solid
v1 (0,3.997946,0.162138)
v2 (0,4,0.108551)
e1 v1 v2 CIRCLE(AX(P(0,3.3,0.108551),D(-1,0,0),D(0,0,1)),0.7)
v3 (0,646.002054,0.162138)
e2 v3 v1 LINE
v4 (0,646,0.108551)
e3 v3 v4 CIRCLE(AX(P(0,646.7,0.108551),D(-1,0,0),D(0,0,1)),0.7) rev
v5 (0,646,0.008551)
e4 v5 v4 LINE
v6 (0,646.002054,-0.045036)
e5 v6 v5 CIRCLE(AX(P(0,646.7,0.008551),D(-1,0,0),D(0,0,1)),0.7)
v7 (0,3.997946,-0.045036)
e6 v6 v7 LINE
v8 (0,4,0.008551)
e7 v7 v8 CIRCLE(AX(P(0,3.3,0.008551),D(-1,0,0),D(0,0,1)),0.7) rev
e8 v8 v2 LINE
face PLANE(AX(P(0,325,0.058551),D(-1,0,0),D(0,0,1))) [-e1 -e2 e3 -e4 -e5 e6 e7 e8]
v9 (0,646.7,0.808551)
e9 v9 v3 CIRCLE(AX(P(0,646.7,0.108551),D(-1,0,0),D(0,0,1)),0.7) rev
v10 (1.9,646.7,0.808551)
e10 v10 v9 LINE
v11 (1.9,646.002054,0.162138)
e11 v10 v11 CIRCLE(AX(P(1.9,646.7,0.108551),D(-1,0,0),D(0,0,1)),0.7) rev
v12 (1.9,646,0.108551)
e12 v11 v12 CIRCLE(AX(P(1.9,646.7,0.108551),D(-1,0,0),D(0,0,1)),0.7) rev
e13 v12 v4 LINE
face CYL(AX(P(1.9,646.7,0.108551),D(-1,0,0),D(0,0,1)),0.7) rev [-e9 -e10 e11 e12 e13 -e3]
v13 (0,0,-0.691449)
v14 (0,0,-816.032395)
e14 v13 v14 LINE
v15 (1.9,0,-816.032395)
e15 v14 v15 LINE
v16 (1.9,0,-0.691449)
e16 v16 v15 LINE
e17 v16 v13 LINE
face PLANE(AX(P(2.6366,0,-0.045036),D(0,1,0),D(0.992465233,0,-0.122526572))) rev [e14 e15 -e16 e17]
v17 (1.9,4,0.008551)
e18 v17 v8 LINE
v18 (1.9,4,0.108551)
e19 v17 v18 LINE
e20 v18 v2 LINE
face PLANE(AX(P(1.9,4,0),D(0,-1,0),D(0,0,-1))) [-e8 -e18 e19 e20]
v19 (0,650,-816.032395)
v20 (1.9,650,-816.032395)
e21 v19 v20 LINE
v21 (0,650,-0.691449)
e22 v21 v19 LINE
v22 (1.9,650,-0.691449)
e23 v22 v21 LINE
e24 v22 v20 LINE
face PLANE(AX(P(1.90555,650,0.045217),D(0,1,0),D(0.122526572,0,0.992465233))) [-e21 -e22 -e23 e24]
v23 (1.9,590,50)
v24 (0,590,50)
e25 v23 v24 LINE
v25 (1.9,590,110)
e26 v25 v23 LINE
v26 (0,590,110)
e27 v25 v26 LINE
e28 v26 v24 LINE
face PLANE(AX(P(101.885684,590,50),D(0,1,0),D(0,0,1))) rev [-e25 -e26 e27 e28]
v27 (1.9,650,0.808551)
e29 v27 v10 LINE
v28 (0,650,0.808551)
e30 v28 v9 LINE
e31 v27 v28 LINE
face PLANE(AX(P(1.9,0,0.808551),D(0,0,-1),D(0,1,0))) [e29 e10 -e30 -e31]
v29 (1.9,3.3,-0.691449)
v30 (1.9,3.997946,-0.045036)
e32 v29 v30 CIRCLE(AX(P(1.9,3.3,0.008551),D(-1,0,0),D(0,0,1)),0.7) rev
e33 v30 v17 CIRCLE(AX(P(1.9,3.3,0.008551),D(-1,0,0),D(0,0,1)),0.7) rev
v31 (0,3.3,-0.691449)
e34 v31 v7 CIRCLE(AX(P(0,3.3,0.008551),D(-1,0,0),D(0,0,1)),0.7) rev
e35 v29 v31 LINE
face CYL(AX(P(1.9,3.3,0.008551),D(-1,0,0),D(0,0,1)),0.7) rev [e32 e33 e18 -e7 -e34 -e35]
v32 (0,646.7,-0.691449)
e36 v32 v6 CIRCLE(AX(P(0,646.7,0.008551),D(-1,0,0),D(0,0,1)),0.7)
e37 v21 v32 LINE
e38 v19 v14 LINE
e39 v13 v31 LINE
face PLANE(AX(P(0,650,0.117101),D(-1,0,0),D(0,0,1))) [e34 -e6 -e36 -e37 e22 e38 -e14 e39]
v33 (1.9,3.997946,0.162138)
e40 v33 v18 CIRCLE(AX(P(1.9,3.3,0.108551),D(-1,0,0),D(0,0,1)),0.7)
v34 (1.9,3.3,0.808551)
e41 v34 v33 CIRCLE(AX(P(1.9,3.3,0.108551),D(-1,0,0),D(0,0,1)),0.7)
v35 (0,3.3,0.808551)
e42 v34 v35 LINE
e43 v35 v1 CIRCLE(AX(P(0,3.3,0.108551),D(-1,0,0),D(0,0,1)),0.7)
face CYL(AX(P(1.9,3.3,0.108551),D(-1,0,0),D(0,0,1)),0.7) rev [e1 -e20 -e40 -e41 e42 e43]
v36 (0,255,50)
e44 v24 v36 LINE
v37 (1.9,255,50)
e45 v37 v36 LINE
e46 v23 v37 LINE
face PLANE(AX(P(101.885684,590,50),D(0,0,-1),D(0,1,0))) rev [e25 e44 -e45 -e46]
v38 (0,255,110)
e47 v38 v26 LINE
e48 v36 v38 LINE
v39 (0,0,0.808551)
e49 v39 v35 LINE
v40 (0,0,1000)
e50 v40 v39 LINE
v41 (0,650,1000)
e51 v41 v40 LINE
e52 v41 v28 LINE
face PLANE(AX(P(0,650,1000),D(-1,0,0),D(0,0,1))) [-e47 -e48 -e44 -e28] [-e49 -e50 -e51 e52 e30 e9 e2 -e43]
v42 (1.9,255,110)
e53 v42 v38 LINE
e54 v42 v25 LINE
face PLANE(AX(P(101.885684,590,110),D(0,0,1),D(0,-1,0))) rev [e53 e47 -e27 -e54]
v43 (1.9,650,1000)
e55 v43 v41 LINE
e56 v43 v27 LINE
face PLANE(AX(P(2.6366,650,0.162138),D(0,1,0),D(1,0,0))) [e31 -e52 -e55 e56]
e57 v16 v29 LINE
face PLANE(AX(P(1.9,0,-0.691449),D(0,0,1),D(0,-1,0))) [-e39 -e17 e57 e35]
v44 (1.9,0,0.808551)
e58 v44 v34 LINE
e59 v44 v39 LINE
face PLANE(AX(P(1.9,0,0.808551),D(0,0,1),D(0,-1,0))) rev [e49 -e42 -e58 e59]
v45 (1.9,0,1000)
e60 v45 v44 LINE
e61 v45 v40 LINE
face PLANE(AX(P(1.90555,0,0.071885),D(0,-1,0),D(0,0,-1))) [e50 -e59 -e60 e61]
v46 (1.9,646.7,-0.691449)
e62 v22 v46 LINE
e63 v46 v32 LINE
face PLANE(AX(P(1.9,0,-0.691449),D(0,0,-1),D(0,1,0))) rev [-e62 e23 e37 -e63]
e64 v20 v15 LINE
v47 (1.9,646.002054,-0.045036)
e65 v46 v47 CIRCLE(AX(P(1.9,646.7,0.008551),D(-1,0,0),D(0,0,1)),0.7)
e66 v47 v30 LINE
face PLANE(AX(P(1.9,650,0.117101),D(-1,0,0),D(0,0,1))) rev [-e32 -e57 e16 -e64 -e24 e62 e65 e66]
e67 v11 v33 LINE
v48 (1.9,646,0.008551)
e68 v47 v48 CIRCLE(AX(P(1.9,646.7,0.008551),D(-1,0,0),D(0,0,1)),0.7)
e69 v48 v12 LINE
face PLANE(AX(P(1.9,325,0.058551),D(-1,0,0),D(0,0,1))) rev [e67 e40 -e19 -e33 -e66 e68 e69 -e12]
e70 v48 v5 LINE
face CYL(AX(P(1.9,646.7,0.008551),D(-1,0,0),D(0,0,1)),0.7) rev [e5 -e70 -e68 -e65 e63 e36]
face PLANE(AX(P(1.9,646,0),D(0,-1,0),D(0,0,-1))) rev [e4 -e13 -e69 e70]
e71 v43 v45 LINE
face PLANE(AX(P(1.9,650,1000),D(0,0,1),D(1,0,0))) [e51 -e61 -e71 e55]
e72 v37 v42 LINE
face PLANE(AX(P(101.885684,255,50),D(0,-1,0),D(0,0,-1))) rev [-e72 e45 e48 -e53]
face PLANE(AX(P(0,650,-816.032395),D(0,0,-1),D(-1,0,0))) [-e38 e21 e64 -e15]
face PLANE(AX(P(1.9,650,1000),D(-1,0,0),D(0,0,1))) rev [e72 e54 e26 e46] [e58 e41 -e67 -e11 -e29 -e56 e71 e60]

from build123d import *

# Parameters (mm, degrees)
BRIDA_BASE2_DEPTH          = 650
CORTAR_EXTRUIR1_DEPTH      = 1198.029946406
CORTAR_EXTRUIR1_DEPTH_BACK = 1198.029946406
CROQUIS11_W                = 60
CROQUIS11_H                = 335
DESDOBLAR2_DEPTH           = 650
DESDOBLAR2_2_DEPTH         = 650
CORTAR_EXTRUIR2_DEPTH      = 1193.687557577
CORTAR_EXTRUIR2_DEPTH_BACK = 1193.687557577


# Read off the part's stored shape, not the designer's step: Desdoblar2
# Sheet-metal steps are written as plain solids
with BuildPart() as part:
    # Croquis1 → Brida base2 (new body)
    with BuildSketch(Plane(origin=(0, 0, 0), x_dir=(1, 0, 0), z_dir=(0, 1, 0))):
        with BuildLine():
            Line((0, -1000), (0, -0.162137614))
            ThreePointArc((0, -0.162137614), (0.004971228, -0.000305705), (0.019866166, 0.160915945))
            Line((0.019866166, 0.160915945), (100, 810))
            Line((100, 810), (101.885683943, 809.767199513))
            Line((101.885683943, 809.767199513), (1.905550109, -0.071884541))
            ThreePointArc((1.905550109, -0.071884541), (1.901388837, -0.116925833), (1.9, -0.162137614))
            Line((1.9, -0.162137614), (1.9, -1000))
            Line((1.9, -1000), (0, -1000))
        make_face()
    extrude(amount=BRIDA_BASE2_DEPTH)

    # Croquis11 → Cortar-Extruir1 (cut, two sides: drawn at the far end of the back side and taken through both)
    with BuildSketch(Plane.ZY.offset(-CORTAR_EXTRUIR1_DEPTH_BACK)):
        with Locations((80, 422.5)):
            Rectangle(CROQUIS11_W, CROQUIS11_H)
    extrude(amount=CORTAR_EXTRUIR1_DEPTH + CORTAR_EXTRUIR1_DEPTH_BACK, mode=Mode.SUBTRACT)

    # Desdoblar2 outline → Desdoblar2 (cut)
    with BuildSketch(Plane(origin=(0, 0, 0), x_dir=(1, 0, 0), z_dir=(0, 1, 0))):
        with BuildLine():
            Line((100, 810), (1.9, 15.39))
            Line((1.9, 15.39), (1.9, -0.162137614))
            ThreePointArc((1.9, -0.162137614), (1.901388837, -0.116925832), (1.905550109, -0.071884541))
            Line((1.905550109, -0.071884541), (101.885683943, 809.767199513))
            Line((101.885683943, 809.767199513), (100, 810))
        make_face()
    extrude(amount=DESDOBLAR2_DEPTH, mode=Mode.SUBTRACT)

    # Desdoblar2 2 outline → Desdoblar2 2 (add)
    with BuildSketch(Plane(origin=(0, 0, 0), x_dir=(1, 0, 0), z_dir=(0, 1, 0))):
        with BuildLine():
            Line((1.9, 15.39), (1.9, 816.032394795))
            Line((1.9, 816.032394795), (0, 816.032394795))
            Line((0, 816.032394795), (0, -0.162137614))
            ThreePointArc((0, -0.162137614), (0.004971228, -0.000305705), (0.019866166, 0.160915945))
            Line((0.019866166, 0.160915945), (1.9, 15.39))
        make_face()
    extrude(amount=DESDOBLAR2_2_DEPTH)

    # Croquis12 → Cortar-Extruir2 (cut, two sides: drawn at the far end of the back side and taken through both)
    with BuildSketch(Plane.ZY.offset(-CORTAR_EXTRUIR2_DEPTH_BACK)):
        with BuildLine():
            ThreePointArc((0.108550657, 646), (0.135363814, 646.000513721), (0.162137614, 646.00205413))
            Line((0.162137614, 646.00205413), (0.162137614, 650))
            Line((0.162137614, 650), (-0.691449343, 650))
            Line((-0.691449343, 650), (-0.691449343, 646.7))
            ThreePointArc((-0.691449343, 646.7), (-0.486424089, 646.205025253), (0.008550657, 646))
            Line((0.008550657, 646), (0.108550657, 646))
        make_face()
        with BuildLine():
            Line((0.162137614, 650), (0.162137614, 646.00205413))
            ThreePointArc((0.162137614, 646.00205413), (0.622121913, 646.224348273), (0.808550657, 646.7))
            Line((0.808550657, 646.7), (0.808550657, 650))
            Line((0.808550657, 650), (0.162137614, 650))
        make_face()
        with BuildLine():
            Line((-0.691449343, 0), (-0.045036299, 0))
            Line((-0.045036299, 0), (0.162137614, 0))
            Line((0.162137614, 0), (0.162137614, 3.99794587))
            ThreePointArc((0.162137614, 3.99794587), (0.135363814, 3.999486279), (0.108550657, 4))
            Line((0.108550657, 4), (0.008550657, 4))
            ThreePointArc((0.008550657, 4), (-0.486424089, 3.794974747), (-0.691449343, 3.3))
            Line((-0.691449343, 3.3), (-0.691449343, 0))
        make_face()
        with BuildLine():
            Line((0.162137614, 3.99794587), (0.162137614, 0))
            Line((0.162137614, 0), (0.808550657, 0))
            Line((0.808550657, 0), (0.808550657, 3.3))
            ThreePointArc((0.808550657, 3.3), (0.622121913, 3.775651727), (0.162137614, 3.99794587))
        make_face()
    extrude(amount=CORTAR_EXTRUIR2_DEPTH + CORTAR_EXTRUIR2_DEPTH_BACK, mode=Mode.SUBTRACT)


solid = part.part
